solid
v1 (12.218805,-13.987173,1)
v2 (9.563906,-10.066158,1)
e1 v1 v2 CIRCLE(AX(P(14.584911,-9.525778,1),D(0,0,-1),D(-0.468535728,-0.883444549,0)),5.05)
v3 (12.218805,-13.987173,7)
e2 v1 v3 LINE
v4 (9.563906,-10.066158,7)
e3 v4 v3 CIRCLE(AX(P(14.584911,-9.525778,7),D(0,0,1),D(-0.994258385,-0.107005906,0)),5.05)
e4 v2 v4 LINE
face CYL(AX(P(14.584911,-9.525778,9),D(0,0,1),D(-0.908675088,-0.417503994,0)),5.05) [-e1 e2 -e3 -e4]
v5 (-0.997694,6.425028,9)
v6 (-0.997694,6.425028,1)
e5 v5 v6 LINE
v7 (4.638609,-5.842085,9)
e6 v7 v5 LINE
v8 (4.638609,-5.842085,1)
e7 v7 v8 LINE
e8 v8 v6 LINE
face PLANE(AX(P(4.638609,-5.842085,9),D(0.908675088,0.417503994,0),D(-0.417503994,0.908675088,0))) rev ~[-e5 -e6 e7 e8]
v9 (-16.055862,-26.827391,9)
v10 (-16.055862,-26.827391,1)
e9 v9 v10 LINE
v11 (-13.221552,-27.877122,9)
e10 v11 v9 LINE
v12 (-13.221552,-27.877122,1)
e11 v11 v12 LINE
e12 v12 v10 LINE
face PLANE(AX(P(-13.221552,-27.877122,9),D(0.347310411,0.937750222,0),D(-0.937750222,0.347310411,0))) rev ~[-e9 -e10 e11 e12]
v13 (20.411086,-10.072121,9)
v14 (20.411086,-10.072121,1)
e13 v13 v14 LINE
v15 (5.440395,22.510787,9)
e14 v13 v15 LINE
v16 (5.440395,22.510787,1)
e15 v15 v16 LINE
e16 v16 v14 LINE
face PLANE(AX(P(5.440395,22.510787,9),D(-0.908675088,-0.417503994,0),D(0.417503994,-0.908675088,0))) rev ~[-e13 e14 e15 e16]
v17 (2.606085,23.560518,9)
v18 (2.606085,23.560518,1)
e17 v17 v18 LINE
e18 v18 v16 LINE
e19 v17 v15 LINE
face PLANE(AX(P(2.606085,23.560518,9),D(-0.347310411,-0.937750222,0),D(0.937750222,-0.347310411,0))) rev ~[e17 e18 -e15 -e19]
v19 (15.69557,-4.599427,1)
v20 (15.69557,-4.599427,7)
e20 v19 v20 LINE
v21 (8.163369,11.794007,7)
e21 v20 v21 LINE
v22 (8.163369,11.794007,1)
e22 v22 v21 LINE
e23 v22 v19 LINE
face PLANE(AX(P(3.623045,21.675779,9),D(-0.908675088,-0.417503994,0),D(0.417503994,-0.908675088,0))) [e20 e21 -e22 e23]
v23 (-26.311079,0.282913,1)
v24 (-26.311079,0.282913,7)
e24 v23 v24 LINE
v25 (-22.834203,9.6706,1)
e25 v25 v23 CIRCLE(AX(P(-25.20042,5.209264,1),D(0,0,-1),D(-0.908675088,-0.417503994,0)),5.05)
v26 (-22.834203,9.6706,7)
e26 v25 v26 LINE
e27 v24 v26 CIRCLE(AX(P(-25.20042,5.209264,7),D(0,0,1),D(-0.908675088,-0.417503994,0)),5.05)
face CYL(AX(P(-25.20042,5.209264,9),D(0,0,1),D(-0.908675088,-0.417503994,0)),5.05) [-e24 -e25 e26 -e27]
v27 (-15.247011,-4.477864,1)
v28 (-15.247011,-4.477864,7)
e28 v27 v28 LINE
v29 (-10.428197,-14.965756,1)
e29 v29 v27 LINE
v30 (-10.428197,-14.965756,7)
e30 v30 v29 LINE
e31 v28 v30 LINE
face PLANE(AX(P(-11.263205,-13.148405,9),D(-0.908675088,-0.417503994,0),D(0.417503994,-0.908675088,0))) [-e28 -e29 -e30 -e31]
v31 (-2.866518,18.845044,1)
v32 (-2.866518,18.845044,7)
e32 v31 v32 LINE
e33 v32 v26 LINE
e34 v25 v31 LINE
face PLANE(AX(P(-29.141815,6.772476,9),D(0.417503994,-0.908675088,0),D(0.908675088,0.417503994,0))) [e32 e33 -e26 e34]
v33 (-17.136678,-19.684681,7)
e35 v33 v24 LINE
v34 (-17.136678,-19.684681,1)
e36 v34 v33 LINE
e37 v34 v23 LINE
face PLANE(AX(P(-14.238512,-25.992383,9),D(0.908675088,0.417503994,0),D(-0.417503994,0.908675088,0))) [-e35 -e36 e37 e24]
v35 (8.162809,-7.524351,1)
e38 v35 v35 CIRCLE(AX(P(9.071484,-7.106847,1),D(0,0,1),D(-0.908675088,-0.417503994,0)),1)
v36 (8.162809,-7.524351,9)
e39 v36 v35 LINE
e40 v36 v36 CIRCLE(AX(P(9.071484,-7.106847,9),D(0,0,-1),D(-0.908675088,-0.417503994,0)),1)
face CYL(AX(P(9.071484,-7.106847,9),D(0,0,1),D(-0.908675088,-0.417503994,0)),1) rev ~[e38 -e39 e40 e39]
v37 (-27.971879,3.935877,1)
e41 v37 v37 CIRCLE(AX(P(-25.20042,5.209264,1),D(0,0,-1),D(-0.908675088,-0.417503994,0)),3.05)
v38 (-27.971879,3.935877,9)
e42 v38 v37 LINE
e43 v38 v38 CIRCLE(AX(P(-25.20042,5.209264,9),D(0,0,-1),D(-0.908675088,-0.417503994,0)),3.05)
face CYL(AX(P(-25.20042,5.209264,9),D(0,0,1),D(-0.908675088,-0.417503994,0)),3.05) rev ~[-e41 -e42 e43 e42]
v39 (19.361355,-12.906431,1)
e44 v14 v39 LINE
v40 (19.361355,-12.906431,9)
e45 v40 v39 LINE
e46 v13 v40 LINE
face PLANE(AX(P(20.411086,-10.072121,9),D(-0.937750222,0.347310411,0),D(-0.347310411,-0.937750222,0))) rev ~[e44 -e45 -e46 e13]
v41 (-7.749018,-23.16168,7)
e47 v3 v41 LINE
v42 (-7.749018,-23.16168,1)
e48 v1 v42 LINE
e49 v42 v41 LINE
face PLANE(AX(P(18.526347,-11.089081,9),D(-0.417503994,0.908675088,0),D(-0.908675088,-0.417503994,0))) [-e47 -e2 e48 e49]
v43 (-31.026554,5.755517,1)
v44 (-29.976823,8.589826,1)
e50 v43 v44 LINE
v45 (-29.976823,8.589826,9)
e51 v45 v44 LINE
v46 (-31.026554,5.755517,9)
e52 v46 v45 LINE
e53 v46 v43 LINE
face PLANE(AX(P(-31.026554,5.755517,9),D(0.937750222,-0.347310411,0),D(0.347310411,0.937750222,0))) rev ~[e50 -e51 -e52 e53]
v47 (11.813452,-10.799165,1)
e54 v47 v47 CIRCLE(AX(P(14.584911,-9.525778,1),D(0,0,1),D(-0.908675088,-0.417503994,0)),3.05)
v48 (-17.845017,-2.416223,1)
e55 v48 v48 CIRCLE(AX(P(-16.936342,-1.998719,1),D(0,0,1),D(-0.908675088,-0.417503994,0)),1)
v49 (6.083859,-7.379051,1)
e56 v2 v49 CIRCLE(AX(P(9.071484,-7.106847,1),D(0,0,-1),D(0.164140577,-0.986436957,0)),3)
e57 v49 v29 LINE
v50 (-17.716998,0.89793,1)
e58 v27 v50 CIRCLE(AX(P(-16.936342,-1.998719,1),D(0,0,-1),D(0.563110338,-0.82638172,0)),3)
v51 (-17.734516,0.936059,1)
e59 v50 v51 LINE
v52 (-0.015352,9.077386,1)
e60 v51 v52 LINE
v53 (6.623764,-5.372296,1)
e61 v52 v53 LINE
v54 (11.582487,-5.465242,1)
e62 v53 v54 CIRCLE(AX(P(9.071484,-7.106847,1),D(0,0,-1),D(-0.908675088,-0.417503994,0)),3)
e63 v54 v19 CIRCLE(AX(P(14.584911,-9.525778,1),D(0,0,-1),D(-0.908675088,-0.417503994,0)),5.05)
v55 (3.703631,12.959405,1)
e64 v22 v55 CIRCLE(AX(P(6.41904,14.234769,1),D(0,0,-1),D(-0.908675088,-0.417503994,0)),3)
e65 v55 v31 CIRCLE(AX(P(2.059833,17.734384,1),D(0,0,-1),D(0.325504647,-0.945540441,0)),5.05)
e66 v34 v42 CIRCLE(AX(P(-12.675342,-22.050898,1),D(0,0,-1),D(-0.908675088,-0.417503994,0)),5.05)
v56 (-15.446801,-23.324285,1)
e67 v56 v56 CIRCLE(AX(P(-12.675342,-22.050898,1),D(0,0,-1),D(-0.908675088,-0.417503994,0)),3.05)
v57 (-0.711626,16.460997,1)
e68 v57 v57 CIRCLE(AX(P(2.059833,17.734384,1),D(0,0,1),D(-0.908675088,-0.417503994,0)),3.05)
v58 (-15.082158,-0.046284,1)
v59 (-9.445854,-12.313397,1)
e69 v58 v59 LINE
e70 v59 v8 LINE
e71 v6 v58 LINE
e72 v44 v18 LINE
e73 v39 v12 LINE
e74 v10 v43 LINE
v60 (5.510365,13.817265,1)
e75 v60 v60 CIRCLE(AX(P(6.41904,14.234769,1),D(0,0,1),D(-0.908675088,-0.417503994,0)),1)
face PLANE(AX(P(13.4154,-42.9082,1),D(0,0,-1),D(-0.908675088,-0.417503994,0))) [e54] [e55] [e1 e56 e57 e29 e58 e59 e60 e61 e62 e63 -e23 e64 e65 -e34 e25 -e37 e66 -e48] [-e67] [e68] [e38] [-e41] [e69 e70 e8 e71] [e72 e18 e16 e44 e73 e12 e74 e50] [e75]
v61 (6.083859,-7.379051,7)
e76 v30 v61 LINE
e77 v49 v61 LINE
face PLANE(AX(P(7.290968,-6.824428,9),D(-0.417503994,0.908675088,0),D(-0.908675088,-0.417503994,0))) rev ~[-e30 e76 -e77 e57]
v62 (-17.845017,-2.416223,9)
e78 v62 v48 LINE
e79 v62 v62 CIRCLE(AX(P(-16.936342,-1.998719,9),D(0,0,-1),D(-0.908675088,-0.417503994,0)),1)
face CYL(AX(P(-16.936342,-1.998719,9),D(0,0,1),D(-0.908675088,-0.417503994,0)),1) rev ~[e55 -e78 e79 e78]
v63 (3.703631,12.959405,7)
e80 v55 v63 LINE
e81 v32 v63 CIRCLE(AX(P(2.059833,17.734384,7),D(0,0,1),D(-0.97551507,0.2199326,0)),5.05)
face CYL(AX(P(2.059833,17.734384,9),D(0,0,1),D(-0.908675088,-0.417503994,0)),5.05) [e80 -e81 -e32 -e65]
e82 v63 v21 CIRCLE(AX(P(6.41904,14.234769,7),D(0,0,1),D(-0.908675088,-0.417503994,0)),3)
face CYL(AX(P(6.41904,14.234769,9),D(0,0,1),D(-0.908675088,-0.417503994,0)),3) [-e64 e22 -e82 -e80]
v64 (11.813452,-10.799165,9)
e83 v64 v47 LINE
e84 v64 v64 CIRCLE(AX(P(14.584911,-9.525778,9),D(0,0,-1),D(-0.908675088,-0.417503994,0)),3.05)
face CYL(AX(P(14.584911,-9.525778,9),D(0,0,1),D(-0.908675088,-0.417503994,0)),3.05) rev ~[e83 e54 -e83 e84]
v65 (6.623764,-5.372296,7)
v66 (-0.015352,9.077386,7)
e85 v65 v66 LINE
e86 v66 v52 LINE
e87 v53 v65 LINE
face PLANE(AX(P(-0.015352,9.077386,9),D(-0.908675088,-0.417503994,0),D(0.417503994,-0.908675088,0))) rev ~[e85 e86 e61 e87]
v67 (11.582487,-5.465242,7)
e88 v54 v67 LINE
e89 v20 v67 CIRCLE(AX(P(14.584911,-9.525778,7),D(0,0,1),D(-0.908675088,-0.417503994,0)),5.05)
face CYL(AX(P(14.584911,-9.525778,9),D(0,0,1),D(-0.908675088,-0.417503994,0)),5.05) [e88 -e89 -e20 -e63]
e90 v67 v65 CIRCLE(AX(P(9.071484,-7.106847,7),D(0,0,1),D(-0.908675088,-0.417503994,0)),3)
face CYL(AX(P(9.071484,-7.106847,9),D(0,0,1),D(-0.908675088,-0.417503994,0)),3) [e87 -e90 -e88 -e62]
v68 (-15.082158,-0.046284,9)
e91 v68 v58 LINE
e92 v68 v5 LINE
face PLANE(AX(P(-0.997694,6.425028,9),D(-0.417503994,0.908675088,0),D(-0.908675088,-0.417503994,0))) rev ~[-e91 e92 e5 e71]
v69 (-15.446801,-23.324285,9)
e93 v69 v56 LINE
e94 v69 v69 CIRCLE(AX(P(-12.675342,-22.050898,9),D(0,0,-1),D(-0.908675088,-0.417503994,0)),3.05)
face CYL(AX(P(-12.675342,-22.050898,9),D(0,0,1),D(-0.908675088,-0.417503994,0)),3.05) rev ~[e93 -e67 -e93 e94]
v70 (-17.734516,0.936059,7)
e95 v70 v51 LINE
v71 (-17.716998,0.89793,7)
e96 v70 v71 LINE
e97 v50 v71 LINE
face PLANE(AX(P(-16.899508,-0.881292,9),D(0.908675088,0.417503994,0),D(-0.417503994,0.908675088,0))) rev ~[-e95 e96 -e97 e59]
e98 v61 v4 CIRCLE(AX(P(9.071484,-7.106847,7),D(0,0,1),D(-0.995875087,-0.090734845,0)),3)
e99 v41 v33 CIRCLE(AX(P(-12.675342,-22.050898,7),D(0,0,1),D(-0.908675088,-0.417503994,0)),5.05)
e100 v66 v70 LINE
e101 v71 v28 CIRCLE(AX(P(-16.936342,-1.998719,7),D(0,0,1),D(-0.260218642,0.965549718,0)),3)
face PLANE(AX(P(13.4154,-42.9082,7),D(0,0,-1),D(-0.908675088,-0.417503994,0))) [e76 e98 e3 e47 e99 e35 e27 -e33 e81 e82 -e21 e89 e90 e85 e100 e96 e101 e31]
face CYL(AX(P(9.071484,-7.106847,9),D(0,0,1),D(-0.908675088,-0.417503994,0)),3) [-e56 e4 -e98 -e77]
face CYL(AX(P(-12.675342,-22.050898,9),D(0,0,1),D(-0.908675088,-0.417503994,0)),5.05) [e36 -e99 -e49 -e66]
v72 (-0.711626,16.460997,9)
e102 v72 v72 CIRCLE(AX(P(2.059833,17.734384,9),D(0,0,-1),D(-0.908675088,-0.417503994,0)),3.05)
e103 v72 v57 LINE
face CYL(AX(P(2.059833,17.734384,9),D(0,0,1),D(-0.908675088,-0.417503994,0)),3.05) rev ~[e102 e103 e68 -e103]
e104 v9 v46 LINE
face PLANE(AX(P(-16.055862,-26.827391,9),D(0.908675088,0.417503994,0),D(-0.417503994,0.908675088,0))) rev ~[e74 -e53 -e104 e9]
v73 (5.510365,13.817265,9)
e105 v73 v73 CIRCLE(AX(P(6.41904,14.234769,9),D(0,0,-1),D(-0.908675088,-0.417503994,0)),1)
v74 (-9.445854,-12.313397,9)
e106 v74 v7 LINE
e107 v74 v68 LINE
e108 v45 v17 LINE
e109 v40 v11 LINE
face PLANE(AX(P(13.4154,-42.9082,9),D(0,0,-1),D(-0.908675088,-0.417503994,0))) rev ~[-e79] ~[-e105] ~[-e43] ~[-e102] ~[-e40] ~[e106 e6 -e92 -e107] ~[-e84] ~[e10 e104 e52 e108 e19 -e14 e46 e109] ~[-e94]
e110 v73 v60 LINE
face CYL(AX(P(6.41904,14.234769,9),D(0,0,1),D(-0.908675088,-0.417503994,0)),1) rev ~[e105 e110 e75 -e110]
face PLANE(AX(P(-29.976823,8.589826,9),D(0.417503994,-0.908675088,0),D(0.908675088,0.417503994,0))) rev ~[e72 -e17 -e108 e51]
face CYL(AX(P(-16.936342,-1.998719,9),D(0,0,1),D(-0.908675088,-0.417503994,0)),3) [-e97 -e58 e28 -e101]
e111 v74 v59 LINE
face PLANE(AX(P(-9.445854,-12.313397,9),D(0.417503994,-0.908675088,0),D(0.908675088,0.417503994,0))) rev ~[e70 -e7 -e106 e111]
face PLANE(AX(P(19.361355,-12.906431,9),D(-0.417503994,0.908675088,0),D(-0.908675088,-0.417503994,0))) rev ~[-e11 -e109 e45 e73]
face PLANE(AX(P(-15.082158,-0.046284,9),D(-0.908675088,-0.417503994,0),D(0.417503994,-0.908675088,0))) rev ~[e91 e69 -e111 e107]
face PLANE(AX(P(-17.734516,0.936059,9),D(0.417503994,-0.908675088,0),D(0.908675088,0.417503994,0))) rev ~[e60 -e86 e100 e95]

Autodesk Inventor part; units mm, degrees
ref_plane "YZ Plane" through (0, 0, 0) normal (1, 0, 0) x (0, 1, 0)
ref_plane "XZ Plane" through (0, 0, 0) normal (0, 1, 0) x (-1, 0, 0)
ref_plane "XY Plane" through (0, 0, 0) normal (0, 0, 1) x (1, 0, 0)
ref_plane "Work Plane1" through (0, 0, 0) normal (0, 0, 1) x (1, 0, 0)
ref_plane "Work Plane2" through (13.4154, -42.9082, 9) normal (0, 0, -1) x (-0.9086751, -0.417504, 0)
sketch "Sketch1" plane through (13.4154, -42.9082, 9) normal (0, 0, -1) x (-0.9086751, -0.417504, 0)
  line L0 (20.066, 26.9166) -> (20.066, 62.7742) projected
  line L1 (20.066, 62.7742) -> (17.9288, 64.9114) projected
  line L2 (17.9288, 64.9114) -> (-17.9288, 64.9114) projected
  line L3 (-17.9288, 64.9114) -> (-20.066, 62.7742) projected
  line L4 (-20.066, 62.7742) -> (-20.066, 26.9166) projected
  line L5 (-20.066, 26.9166) -> (-17.9288, 24.7794) projected
  line L6 (-17.9288, 24.7794) -> (17.9288, 24.7794) projected
  line L7 (17.9288, 24.7794) -> (20.066, 26.9166) projected
  circle A0 centre (-15, 59.8454) radius 3.2639 projected
  circle A1 centre (15, 59.8454) radius 3.2639 projected
  circle A2 centre (-15, 29.8455) radius 3.2639 projected
  circle A3 centre (15, 29.8455) radius 3.2639 projected
  circle A4 centre (0, 44.8454) radius 13.3985 projected
  line L8 (8, 50.8454) -> (-7.5, 50.8454) construction
  line L9 (-7.5, 50.8454) -> (-7.5, 37.3454) construction
  line L10 (-7.5, 37.3454) -> (8, 37.3454) construction
  line L11 (8, 37.3454) -> (8, 50.8454) construction
  circle A5 centre (-17.5, 54.8454) radius 1 construction
  circle A6 centre (-11, 34.3454) radius 1 construction
  circle A7 centre (10.5, 49.8454) radius 1 construction
  arc A8 (-15.8555, 56.5454) -> (-16.8555, 57.5454) centre (-16.8555, 56.5454) ccw construction
  line L12 (-15.8555, 56.5454) -> (-15.8555, 53.8078) construction
  arc A9 (-15.8555, 53.8078) -> (-14.8555, 52.8078) centre (-14.8555, 53.8078) ccw construction
  line L13 (-14.8555, 52.8078) -> (12, 52.8078) construction
  arc A10 (13, 51.8078) -> (12, 52.8078) centre (12, 51.8078) ccw construction
  line L14 (13, 51.8078) -> (13, 49.2425) construction
  arc A11 (12, 48.2425) -> (13, 49.2425) centre (12, 49.2425) ccw construction
  line L15 (12, 48.2425) -> (11, 48.2425) construction
  arc A12 (11, 48.2425) -> (10, 47.2425) centre (11, 47.2425) ccw construction
  line L16 (10, 47.2425) -> (10, 35.7078) construction
  line L17 (10, 35.7078) -> (-8.4723, 35.7078) construction
  arc A13 (-8.4723, 35.7078) -> (-9.4723, 34.7078) centre (-8.4723, 34.7078) ccw construction
  line L18 (-9.4723, 34.7078) -> (-9.4723, 32.8454) construction
  arc A14 (-10.4723, 31.8454) -> (-9.4723, 32.8454) centre (-10.4723, 32.8454) ccw construction
  line L19 (-10.4723, 31.8454) -> (-20, 31.8454) construction
  line L20 (-20, 31.8454) -> (-20, 57.5454) construction
  line L21 (-20, 57.5454) -> (-16.8555, 57.5454) construction
  line L22 (8, 37.3454) -> (-7.5, 37.3454)
  line L23 (-7.5, 37.3454) -> (-7.5, 50.8454)
  line L24 (-7.5, 50.8454) -> (8, 50.8454)
  line L25 (8, 50.8454) -> (8, 37.3454)
  circle A15 centre (10.5, 49.8454) radius 1
  circle A16 centre (-17.5, 54.8454) radius 1
  circle A17 centre (-11, 34.3454) radius 1
  circle A18 centre (15, 29.8455) radius 3.05
  circle A19 centre (-15, 29.8455) radius 3.05
  circle A20 centre (-15, 59.8454) radius 3.05
  circle A21 centre (15, 59.8454) radius 3.05
  point P0 (-5.7241, 44.5906)
  dimension "d2" = 6.1
  dimension "d3" = 6.1
  dimension "d4" = 6.1
  dimension "d5" = 6.1
extrude "Extrusion1" add sketch "Sketch1" along normal blind 8 contours L7 L6 L5 L4 L3 L2 L1 L0 | A0 | A1 | A2 | A3 | A4
shell "Shell1" thickness 2 removed faces 1 at (-8.0461, 9.7896, 1)
properties part number "10_Adapter_KES400_Thorlabs"
